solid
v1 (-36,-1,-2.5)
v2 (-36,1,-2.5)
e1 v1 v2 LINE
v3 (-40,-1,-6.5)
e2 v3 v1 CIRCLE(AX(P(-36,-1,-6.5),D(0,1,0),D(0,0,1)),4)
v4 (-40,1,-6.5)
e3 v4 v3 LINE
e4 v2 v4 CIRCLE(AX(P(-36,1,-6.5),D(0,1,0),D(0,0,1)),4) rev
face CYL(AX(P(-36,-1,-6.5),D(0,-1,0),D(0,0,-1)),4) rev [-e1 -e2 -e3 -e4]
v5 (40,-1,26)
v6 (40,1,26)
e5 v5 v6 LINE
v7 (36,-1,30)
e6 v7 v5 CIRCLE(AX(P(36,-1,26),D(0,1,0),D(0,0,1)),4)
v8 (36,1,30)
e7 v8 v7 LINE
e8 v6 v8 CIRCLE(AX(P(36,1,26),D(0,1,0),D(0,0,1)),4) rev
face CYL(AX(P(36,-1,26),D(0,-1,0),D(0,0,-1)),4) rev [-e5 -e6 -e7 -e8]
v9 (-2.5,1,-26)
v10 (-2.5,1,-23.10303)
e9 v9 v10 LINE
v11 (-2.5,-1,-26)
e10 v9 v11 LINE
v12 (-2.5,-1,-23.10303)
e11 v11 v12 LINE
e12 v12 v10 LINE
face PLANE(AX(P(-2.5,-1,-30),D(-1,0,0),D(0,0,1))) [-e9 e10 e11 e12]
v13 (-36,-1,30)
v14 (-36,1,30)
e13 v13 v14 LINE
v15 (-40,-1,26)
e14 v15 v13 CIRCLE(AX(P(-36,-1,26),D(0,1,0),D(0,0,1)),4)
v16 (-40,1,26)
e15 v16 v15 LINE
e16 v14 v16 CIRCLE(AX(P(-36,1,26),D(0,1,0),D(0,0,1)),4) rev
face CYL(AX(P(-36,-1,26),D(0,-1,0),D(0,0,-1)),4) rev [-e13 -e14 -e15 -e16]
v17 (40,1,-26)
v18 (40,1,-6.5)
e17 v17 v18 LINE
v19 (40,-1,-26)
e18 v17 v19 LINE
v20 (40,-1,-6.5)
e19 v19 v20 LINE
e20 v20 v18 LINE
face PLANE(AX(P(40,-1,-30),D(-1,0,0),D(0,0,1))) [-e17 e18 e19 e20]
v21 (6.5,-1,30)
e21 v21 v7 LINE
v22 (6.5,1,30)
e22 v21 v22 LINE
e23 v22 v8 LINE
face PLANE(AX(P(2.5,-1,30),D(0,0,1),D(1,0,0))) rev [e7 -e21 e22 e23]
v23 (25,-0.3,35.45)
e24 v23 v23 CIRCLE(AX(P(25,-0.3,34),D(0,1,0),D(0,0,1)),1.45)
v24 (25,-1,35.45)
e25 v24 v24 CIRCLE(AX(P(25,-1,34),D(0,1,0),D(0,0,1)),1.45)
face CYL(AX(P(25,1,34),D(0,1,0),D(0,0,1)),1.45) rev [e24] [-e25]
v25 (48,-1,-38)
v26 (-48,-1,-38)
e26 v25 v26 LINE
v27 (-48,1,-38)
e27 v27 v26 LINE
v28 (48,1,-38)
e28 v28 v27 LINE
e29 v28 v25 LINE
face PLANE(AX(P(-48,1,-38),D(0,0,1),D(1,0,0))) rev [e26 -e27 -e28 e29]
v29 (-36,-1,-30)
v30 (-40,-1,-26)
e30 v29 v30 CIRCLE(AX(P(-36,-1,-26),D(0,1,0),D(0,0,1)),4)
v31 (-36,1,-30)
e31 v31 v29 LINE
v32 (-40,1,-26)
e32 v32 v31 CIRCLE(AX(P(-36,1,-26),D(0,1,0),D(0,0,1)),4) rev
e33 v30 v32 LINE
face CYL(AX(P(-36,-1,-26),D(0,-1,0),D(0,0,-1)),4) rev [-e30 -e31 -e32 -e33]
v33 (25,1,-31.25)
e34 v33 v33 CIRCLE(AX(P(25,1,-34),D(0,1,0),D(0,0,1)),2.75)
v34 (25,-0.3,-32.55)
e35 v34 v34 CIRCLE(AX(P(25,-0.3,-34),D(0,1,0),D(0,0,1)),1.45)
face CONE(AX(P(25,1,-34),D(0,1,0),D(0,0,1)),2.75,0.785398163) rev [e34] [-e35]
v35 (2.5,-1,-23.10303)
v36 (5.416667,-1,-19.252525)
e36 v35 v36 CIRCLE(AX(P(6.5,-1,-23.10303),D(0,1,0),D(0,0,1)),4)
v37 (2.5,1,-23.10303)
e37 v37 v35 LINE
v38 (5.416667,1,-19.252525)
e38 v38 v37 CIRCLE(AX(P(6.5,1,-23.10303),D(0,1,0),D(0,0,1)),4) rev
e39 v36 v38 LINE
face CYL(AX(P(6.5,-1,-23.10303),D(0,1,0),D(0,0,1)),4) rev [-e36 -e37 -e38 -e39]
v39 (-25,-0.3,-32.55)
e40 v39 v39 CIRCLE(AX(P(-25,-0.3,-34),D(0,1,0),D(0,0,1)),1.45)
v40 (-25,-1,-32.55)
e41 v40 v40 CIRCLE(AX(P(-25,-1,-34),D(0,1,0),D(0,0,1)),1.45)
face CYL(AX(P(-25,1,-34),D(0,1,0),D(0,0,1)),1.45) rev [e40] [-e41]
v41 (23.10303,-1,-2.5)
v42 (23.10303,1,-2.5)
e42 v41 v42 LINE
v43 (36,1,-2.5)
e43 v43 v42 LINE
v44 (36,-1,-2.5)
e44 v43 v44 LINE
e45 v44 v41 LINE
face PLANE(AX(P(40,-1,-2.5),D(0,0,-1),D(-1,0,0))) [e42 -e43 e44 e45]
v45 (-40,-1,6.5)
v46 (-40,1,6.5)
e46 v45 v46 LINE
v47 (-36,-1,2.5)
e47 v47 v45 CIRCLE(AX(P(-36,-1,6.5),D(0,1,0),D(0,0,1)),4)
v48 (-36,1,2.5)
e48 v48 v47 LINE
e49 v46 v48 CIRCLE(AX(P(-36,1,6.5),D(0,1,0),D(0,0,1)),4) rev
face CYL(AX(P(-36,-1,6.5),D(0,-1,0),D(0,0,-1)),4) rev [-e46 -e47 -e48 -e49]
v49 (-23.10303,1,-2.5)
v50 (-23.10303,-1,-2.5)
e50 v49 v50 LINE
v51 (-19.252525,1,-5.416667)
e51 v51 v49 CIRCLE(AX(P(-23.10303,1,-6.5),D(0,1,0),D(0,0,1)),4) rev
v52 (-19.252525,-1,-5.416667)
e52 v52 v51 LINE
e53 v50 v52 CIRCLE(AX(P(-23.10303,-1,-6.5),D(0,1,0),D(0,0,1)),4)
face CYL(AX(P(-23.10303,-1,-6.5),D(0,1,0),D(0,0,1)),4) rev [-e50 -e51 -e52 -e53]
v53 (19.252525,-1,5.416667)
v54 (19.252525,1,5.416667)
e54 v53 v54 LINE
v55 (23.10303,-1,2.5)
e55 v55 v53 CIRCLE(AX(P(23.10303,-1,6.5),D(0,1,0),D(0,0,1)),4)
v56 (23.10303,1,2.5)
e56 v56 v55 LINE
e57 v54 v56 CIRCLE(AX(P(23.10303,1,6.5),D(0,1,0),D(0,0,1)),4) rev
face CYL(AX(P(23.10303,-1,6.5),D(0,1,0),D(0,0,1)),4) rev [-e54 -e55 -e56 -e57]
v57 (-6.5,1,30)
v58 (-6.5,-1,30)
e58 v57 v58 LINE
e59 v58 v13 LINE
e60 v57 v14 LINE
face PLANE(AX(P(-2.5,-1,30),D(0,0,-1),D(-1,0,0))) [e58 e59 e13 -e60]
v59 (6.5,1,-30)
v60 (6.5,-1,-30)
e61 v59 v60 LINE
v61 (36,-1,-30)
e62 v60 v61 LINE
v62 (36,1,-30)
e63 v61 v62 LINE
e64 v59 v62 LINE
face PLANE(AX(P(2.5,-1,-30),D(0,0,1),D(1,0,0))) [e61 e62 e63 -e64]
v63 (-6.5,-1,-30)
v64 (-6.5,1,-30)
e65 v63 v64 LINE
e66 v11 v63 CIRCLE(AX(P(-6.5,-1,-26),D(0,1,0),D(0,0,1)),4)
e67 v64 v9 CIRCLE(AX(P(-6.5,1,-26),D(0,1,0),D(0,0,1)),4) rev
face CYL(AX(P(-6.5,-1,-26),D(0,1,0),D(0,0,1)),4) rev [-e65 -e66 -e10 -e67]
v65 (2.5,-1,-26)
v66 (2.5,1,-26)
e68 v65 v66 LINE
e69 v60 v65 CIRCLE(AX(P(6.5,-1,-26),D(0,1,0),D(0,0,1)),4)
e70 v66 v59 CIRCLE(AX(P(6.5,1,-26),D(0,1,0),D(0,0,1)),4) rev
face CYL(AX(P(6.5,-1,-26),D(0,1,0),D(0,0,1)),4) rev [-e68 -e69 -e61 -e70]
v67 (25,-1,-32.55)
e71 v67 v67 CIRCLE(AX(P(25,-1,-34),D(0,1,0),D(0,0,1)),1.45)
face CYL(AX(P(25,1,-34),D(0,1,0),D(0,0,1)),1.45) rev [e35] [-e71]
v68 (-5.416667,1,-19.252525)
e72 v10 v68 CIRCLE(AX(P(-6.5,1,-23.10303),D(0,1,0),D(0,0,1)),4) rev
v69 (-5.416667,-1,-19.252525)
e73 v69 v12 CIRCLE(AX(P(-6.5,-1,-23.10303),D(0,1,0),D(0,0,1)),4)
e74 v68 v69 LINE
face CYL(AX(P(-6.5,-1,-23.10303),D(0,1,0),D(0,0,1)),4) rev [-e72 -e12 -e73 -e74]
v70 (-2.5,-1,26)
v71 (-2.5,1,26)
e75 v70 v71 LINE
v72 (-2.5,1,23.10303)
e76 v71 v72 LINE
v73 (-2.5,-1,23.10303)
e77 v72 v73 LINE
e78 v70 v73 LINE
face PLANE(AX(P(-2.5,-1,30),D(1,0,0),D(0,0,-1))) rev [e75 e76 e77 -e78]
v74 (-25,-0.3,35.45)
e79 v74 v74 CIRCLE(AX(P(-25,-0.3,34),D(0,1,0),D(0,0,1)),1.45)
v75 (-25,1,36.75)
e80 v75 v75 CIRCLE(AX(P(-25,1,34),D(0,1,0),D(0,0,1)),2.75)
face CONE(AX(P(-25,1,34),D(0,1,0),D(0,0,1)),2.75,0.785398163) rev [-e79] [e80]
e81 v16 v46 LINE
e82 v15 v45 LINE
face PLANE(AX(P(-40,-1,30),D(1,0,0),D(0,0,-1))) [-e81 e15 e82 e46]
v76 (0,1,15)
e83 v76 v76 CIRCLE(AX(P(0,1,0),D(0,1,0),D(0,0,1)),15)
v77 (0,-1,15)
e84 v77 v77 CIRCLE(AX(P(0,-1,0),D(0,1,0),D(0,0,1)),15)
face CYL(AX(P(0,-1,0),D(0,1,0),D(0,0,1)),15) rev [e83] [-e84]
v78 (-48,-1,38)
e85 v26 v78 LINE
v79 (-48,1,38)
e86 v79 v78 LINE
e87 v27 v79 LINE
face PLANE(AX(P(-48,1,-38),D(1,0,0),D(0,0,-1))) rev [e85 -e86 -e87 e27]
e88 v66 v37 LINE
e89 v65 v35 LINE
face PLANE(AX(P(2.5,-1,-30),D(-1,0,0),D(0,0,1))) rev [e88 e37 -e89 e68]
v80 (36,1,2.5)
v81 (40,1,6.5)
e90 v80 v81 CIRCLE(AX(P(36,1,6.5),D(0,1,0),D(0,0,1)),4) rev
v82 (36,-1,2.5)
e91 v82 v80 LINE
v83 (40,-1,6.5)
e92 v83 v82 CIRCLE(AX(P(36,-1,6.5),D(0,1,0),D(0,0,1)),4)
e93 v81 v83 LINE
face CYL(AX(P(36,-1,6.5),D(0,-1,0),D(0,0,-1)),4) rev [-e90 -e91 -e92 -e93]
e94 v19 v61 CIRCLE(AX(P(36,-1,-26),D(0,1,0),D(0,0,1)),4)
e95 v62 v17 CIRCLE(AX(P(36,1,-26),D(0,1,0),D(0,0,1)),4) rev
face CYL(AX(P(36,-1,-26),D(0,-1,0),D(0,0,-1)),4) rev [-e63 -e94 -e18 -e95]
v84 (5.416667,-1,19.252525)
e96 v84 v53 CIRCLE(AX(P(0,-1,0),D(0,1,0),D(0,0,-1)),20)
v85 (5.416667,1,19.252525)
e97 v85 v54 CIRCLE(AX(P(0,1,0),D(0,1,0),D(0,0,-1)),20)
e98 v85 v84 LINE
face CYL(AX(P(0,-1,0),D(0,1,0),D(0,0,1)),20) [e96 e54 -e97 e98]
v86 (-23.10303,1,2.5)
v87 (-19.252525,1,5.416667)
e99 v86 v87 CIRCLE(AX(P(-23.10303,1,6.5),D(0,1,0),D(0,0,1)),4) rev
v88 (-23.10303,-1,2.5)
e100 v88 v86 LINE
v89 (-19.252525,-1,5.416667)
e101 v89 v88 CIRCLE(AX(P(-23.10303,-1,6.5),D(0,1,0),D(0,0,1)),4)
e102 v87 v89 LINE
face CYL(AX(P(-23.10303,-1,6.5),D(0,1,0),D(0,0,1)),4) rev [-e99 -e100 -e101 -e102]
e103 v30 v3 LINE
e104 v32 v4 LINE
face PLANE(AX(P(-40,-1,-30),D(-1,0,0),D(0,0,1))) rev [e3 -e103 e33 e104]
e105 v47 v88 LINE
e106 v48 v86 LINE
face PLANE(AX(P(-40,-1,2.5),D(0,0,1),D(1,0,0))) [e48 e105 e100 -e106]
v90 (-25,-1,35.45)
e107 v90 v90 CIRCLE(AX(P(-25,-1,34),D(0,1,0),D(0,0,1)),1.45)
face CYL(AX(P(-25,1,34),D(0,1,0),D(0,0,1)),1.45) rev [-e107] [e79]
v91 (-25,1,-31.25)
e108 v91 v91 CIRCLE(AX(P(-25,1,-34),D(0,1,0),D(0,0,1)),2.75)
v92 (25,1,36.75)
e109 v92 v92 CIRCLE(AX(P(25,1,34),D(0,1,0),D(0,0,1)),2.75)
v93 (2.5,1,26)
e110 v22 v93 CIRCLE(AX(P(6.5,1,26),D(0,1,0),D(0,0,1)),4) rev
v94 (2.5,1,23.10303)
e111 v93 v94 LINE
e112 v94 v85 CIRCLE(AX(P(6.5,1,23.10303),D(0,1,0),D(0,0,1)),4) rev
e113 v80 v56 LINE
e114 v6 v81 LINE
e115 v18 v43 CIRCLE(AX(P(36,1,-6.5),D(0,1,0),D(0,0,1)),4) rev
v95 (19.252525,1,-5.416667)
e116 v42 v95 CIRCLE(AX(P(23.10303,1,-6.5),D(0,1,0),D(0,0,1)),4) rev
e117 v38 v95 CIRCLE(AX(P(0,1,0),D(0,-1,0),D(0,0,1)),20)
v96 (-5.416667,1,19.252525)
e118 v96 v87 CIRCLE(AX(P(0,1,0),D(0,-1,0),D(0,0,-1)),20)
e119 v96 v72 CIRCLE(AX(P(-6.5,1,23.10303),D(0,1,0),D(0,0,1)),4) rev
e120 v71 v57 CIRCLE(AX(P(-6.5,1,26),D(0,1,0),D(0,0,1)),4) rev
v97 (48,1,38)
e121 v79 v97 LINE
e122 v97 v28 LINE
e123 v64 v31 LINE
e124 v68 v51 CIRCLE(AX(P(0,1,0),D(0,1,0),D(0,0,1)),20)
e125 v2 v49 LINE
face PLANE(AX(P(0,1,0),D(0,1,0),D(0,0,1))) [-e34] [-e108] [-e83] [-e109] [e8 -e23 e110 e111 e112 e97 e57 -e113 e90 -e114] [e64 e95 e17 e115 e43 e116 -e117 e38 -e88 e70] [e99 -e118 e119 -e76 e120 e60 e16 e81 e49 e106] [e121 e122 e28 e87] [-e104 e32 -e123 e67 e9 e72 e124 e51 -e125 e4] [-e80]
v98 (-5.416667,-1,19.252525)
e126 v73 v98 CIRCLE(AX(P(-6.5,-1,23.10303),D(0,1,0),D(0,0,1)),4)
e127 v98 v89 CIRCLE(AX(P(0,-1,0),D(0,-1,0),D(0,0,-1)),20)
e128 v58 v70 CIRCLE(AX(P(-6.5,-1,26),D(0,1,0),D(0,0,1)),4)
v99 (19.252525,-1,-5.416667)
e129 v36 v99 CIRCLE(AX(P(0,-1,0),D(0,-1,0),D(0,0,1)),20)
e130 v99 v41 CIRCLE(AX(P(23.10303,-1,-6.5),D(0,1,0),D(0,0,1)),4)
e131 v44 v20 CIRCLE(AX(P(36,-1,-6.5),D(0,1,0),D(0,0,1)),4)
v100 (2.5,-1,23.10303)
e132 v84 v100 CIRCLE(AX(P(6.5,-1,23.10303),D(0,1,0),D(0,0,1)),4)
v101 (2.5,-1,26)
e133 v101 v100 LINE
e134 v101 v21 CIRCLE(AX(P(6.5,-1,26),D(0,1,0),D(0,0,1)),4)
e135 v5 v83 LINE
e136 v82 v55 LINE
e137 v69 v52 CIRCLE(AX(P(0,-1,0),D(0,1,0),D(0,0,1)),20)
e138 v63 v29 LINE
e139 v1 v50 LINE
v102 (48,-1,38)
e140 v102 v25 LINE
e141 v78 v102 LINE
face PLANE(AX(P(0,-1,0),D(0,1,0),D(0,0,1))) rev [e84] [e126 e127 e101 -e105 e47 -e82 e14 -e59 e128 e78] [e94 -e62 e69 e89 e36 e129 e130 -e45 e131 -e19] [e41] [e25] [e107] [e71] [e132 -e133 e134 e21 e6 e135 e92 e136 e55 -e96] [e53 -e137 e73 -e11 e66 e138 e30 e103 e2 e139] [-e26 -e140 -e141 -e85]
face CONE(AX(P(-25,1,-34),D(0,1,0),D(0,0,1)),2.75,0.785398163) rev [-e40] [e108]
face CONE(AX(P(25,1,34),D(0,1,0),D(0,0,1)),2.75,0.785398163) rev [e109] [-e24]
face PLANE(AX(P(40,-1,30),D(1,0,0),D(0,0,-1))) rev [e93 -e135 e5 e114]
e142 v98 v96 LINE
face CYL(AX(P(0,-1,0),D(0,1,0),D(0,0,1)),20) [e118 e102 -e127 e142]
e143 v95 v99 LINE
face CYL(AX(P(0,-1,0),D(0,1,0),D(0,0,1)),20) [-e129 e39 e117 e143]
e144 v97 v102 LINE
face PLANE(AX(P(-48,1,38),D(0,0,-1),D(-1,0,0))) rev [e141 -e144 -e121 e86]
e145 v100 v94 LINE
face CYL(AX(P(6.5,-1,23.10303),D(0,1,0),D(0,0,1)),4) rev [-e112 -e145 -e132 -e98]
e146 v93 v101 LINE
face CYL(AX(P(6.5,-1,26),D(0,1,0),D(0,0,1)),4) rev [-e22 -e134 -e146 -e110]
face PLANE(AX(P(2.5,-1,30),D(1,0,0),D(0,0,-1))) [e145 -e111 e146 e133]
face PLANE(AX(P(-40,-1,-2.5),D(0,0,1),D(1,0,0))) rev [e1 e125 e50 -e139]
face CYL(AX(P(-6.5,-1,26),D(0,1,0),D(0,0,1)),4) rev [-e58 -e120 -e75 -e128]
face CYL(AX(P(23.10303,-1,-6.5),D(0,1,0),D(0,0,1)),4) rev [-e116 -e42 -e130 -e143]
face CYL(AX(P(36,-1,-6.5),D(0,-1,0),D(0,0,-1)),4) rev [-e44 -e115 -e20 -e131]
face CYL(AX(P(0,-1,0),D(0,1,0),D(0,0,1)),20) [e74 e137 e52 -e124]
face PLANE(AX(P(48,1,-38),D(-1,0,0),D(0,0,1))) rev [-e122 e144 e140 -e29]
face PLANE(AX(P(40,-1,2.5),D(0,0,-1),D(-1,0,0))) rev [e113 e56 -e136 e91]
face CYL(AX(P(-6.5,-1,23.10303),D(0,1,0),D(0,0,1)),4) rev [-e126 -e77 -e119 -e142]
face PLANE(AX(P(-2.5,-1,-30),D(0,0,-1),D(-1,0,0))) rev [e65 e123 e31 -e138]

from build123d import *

# Parameters (mm, degrees)
SCHIZZO1_W                               = 96
SCHIZZO1_H                               = 76
ESTRUSIONE_ESTRUSIONE1_DEPTH             = 1
TAGLIO_ESTRUSIONE1_DEPTH                 = 62.253571324
TAGLIO_ESTRUSIONE1_DEPTH_BACK            = 62.253571324
SCHIZZO2_R                               = 15
TAGLIO_ESTRUSIONE2_DEPTH                 = 62.253571324
RACCORDO1_R                              = 4
SPECCHIA1_START                          = -1
SPECCHIA1_DEPTH                          = 2
FORO_SVASATO_PER_VITE_M2_5_1_D           = 2.9
FORO_SVASATO_PER_VITE_M2_5_1_DEPTH       = 8.25
FORO_SVASATO_PER_VITE_M2_5_1_CSINK_D     = 5.5
FORO_SVASATO_PER_VITE_M2_5_1_CSINK_ANGLE = 90
FORO_SVASATO_PER_VITE_M2_5_1_TIP         = 0.871247898


# Read off the part's stored shape, not the designer's step: Specchia1
with BuildPart() as part:
    # Schizzo1 → Estrusione-Estrusione1 (new, symmetric)
    with BuildSketch(Plane(origin=(0, 0, 0), x_dir=(1, 0, 0), z_dir=(0, 1, 0))):
        Rectangle(SCHIZZO1_W, SCHIZZO1_H)
    extrude(amount=ESTRUSIONE_ESTRUSIONE1_DEPTH, both=True)

    # Schizzo2 → Taglio-Estrusione1 (cut, two sides: drawn at the far end of the back side and taken through both)
    with BuildSketch(Plane(origin=(0, 1, 0), x_dir=(1, 0, 0), z_dir=(0, 1, 0)).offset(-TAGLIO_ESTRUSIONE1_DEPTH_BACK)):
        with Locations(Location((0, 0, 0), (0, 0, 270))):
            Circle(SCHIZZO2_R)
    extrude(amount=TAGLIO_ESTRUSIONE1_DEPTH + TAGLIO_ESTRUSIONE1_DEPTH_BACK, mode=Mode.SUBTRACT)

    # Schizzo3 → Taglio-Estrusione2 (cut, through all)
    with BuildSketch(Plane(origin=(0, 1, 0), x_dir=(1, 0, 0), z_dir=(0, 1, 0))):
        with BuildLine():
            Line((-2.5, 30), (-2.5, 19.843134833))
            ThreePointArc((-2.5, 19.843134833), (-14.142135624, 14.142135624), (-19.843134833, 2.5))
            Line((-19.843134833, 2.5), (-40, 2.5))
            Line((-40, 2.5), (-40, 30))
            Line((-40, 30), (-2.5, 30))
        make_face()
    extrude(amount=-TAGLIO_ESTRUSIONE2_DEPTH, mode=Mode.SUBTRACT)

    # Raccordo1
    raccordo1_edges = [part.edges().sort_by_distance(p)[0] for p in [
        (-40, 0, -2.5),
        (-40, 0, -30),
        (-2.5, 0, -30),
        (-2.5, 0, -19.843134833),
        (-19.843134833, 0, -2.5),
    ]]
    fillet(raccordo1_edges, radius=RACCORDO1_R)

    # Specchia1 outline → Specchia1 (cut)
    with BuildSketch(Plane(origin=(0, 0, 0), x_dir=(1, 0, 0), z_dir=(0, 1, 0)).offset(SPECCHIA1_START)):
        with BuildLine():
            Line((-40, -6.5), (-40, -26))
            ThreePointArc((-40, -26), (-38.828427125, -28.828427125), (-36, -30))
            Line((-36, -30), (-6.5, -30))
            ThreePointArc((-6.5, -30), (-3.671572875, -28.828427125), (-2.5, -26))
            Line((-2.5, -26), (-2.5, -23.103030104))
            ThreePointArc((-2.5, -23.103030104), (-3.311478922, -20.687800647), (-5.416666667, -19.252525087))
            ThreePointArc((-5.416666667, -19.252525087), (-14.142135624, -14.142135624), (-19.252525087, -5.416666667))
            ThreePointArc((-19.252525087, -5.416666667), (-20.687800647, -3.311478922), (-23.103030104, -2.5))
            Line((-23.103030104, -2.5), (-36, -2.5))
            ThreePointArc((-36, -2.5), (-38.828427125, -3.671572875), (-40, -6.5))
        make_face()
        with BuildLine():
            Line((36, 30), (6.5, 30))
            ThreePointArc((6.5, 30), (3.671572875, 28.828427125), (2.5, 26))
            Line((2.5, 26), (2.5, 23.103030104))
            ThreePointArc((2.5, 23.103030104), (3.311478922, 20.687800647), (5.416666667, 19.252525087))
            ThreePointArc((5.416666667, 19.252525087), (14.142135624, 14.142135624), (19.252525087, 5.416666667))
            ThreePointArc((19.252525087, 5.416666667), (20.687800647, 3.311478922), (23.103030104, 2.5))
            Line((23.103030104, 2.5), (36, 2.5))
            ThreePointArc((36, 2.5), (38.828427125, 3.671572875), (40, 6.5))
            Line((40, 6.5), (40, 26))
            ThreePointArc((40, 26), (38.828427125, 28.828427125), (36, 30))
        make_face()
        with BuildLine():
            ThreePointArc((19.252525087, -5.416666667), (14.142135624, -14.142135624), (5.416666667, -19.252525087))
            ThreePointArc((5.416666667, -19.252525087), (3.311478922, -20.687800647), (2.5, -23.103030104))
            Line((2.5, -23.103030104), (2.5, -26))
            ThreePointArc((2.5, -26), (3.671572875, -28.828427125), (6.5, -30))
            Line((6.5, -30), (36, -30))
            ThreePointArc((36, -30), (38.828427125, -28.828427125), (40, -26))
            Line((40, -26), (40, -6.5))
            ThreePointArc((40, -6.5), (38.828427125, -3.671572875), (36, -2.5))
            Line((36, -2.5), (23.103030104, -2.5))
            ThreePointArc((23.103030104, -2.5), (20.687800647, -3.311478922), (19.252525087, -5.416666667))
        make_face()
    extrude(amount=SPECCHIA1_DEPTH, mode=Mode.SUBTRACT)

    # Foro svasato per Vite M2.5-1
    with Locations(Plane(origin=(0, 1, 0), x_dir=(1, 0, 0), z_dir=(0, 1, 0))):
        with Locations((-25, 34), (25, 34), (25, -34), (-25, -34)):
            CounterSinkHole(FORO_SVASATO_PER_VITE_M2_5_1_D / 2, FORO_SVASATO_PER_VITE_M2_5_1_CSINK_D / 2, depth=FORO_SVASATO_PER_VITE_M2_5_1_DEPTH, counter_sink_angle=FORO_SVASATO_PER_VITE_M2_5_1_CSINK_ANGLE)
            with Locations((0, 0, -(FORO_SVASATO_PER_VITE_M2_5_1_DEPTH + FORO_SVASATO_PER_VITE_M2_5_1_TIP / 2))):  # 118° drill point
                Cone(0, FORO_SVASATO_PER_VITE_M2_5_1_D / 2, FORO_SVASATO_PER_VITE_M2_5_1_TIP, mode=Mode.SUBTRACT)


solid = part.part
